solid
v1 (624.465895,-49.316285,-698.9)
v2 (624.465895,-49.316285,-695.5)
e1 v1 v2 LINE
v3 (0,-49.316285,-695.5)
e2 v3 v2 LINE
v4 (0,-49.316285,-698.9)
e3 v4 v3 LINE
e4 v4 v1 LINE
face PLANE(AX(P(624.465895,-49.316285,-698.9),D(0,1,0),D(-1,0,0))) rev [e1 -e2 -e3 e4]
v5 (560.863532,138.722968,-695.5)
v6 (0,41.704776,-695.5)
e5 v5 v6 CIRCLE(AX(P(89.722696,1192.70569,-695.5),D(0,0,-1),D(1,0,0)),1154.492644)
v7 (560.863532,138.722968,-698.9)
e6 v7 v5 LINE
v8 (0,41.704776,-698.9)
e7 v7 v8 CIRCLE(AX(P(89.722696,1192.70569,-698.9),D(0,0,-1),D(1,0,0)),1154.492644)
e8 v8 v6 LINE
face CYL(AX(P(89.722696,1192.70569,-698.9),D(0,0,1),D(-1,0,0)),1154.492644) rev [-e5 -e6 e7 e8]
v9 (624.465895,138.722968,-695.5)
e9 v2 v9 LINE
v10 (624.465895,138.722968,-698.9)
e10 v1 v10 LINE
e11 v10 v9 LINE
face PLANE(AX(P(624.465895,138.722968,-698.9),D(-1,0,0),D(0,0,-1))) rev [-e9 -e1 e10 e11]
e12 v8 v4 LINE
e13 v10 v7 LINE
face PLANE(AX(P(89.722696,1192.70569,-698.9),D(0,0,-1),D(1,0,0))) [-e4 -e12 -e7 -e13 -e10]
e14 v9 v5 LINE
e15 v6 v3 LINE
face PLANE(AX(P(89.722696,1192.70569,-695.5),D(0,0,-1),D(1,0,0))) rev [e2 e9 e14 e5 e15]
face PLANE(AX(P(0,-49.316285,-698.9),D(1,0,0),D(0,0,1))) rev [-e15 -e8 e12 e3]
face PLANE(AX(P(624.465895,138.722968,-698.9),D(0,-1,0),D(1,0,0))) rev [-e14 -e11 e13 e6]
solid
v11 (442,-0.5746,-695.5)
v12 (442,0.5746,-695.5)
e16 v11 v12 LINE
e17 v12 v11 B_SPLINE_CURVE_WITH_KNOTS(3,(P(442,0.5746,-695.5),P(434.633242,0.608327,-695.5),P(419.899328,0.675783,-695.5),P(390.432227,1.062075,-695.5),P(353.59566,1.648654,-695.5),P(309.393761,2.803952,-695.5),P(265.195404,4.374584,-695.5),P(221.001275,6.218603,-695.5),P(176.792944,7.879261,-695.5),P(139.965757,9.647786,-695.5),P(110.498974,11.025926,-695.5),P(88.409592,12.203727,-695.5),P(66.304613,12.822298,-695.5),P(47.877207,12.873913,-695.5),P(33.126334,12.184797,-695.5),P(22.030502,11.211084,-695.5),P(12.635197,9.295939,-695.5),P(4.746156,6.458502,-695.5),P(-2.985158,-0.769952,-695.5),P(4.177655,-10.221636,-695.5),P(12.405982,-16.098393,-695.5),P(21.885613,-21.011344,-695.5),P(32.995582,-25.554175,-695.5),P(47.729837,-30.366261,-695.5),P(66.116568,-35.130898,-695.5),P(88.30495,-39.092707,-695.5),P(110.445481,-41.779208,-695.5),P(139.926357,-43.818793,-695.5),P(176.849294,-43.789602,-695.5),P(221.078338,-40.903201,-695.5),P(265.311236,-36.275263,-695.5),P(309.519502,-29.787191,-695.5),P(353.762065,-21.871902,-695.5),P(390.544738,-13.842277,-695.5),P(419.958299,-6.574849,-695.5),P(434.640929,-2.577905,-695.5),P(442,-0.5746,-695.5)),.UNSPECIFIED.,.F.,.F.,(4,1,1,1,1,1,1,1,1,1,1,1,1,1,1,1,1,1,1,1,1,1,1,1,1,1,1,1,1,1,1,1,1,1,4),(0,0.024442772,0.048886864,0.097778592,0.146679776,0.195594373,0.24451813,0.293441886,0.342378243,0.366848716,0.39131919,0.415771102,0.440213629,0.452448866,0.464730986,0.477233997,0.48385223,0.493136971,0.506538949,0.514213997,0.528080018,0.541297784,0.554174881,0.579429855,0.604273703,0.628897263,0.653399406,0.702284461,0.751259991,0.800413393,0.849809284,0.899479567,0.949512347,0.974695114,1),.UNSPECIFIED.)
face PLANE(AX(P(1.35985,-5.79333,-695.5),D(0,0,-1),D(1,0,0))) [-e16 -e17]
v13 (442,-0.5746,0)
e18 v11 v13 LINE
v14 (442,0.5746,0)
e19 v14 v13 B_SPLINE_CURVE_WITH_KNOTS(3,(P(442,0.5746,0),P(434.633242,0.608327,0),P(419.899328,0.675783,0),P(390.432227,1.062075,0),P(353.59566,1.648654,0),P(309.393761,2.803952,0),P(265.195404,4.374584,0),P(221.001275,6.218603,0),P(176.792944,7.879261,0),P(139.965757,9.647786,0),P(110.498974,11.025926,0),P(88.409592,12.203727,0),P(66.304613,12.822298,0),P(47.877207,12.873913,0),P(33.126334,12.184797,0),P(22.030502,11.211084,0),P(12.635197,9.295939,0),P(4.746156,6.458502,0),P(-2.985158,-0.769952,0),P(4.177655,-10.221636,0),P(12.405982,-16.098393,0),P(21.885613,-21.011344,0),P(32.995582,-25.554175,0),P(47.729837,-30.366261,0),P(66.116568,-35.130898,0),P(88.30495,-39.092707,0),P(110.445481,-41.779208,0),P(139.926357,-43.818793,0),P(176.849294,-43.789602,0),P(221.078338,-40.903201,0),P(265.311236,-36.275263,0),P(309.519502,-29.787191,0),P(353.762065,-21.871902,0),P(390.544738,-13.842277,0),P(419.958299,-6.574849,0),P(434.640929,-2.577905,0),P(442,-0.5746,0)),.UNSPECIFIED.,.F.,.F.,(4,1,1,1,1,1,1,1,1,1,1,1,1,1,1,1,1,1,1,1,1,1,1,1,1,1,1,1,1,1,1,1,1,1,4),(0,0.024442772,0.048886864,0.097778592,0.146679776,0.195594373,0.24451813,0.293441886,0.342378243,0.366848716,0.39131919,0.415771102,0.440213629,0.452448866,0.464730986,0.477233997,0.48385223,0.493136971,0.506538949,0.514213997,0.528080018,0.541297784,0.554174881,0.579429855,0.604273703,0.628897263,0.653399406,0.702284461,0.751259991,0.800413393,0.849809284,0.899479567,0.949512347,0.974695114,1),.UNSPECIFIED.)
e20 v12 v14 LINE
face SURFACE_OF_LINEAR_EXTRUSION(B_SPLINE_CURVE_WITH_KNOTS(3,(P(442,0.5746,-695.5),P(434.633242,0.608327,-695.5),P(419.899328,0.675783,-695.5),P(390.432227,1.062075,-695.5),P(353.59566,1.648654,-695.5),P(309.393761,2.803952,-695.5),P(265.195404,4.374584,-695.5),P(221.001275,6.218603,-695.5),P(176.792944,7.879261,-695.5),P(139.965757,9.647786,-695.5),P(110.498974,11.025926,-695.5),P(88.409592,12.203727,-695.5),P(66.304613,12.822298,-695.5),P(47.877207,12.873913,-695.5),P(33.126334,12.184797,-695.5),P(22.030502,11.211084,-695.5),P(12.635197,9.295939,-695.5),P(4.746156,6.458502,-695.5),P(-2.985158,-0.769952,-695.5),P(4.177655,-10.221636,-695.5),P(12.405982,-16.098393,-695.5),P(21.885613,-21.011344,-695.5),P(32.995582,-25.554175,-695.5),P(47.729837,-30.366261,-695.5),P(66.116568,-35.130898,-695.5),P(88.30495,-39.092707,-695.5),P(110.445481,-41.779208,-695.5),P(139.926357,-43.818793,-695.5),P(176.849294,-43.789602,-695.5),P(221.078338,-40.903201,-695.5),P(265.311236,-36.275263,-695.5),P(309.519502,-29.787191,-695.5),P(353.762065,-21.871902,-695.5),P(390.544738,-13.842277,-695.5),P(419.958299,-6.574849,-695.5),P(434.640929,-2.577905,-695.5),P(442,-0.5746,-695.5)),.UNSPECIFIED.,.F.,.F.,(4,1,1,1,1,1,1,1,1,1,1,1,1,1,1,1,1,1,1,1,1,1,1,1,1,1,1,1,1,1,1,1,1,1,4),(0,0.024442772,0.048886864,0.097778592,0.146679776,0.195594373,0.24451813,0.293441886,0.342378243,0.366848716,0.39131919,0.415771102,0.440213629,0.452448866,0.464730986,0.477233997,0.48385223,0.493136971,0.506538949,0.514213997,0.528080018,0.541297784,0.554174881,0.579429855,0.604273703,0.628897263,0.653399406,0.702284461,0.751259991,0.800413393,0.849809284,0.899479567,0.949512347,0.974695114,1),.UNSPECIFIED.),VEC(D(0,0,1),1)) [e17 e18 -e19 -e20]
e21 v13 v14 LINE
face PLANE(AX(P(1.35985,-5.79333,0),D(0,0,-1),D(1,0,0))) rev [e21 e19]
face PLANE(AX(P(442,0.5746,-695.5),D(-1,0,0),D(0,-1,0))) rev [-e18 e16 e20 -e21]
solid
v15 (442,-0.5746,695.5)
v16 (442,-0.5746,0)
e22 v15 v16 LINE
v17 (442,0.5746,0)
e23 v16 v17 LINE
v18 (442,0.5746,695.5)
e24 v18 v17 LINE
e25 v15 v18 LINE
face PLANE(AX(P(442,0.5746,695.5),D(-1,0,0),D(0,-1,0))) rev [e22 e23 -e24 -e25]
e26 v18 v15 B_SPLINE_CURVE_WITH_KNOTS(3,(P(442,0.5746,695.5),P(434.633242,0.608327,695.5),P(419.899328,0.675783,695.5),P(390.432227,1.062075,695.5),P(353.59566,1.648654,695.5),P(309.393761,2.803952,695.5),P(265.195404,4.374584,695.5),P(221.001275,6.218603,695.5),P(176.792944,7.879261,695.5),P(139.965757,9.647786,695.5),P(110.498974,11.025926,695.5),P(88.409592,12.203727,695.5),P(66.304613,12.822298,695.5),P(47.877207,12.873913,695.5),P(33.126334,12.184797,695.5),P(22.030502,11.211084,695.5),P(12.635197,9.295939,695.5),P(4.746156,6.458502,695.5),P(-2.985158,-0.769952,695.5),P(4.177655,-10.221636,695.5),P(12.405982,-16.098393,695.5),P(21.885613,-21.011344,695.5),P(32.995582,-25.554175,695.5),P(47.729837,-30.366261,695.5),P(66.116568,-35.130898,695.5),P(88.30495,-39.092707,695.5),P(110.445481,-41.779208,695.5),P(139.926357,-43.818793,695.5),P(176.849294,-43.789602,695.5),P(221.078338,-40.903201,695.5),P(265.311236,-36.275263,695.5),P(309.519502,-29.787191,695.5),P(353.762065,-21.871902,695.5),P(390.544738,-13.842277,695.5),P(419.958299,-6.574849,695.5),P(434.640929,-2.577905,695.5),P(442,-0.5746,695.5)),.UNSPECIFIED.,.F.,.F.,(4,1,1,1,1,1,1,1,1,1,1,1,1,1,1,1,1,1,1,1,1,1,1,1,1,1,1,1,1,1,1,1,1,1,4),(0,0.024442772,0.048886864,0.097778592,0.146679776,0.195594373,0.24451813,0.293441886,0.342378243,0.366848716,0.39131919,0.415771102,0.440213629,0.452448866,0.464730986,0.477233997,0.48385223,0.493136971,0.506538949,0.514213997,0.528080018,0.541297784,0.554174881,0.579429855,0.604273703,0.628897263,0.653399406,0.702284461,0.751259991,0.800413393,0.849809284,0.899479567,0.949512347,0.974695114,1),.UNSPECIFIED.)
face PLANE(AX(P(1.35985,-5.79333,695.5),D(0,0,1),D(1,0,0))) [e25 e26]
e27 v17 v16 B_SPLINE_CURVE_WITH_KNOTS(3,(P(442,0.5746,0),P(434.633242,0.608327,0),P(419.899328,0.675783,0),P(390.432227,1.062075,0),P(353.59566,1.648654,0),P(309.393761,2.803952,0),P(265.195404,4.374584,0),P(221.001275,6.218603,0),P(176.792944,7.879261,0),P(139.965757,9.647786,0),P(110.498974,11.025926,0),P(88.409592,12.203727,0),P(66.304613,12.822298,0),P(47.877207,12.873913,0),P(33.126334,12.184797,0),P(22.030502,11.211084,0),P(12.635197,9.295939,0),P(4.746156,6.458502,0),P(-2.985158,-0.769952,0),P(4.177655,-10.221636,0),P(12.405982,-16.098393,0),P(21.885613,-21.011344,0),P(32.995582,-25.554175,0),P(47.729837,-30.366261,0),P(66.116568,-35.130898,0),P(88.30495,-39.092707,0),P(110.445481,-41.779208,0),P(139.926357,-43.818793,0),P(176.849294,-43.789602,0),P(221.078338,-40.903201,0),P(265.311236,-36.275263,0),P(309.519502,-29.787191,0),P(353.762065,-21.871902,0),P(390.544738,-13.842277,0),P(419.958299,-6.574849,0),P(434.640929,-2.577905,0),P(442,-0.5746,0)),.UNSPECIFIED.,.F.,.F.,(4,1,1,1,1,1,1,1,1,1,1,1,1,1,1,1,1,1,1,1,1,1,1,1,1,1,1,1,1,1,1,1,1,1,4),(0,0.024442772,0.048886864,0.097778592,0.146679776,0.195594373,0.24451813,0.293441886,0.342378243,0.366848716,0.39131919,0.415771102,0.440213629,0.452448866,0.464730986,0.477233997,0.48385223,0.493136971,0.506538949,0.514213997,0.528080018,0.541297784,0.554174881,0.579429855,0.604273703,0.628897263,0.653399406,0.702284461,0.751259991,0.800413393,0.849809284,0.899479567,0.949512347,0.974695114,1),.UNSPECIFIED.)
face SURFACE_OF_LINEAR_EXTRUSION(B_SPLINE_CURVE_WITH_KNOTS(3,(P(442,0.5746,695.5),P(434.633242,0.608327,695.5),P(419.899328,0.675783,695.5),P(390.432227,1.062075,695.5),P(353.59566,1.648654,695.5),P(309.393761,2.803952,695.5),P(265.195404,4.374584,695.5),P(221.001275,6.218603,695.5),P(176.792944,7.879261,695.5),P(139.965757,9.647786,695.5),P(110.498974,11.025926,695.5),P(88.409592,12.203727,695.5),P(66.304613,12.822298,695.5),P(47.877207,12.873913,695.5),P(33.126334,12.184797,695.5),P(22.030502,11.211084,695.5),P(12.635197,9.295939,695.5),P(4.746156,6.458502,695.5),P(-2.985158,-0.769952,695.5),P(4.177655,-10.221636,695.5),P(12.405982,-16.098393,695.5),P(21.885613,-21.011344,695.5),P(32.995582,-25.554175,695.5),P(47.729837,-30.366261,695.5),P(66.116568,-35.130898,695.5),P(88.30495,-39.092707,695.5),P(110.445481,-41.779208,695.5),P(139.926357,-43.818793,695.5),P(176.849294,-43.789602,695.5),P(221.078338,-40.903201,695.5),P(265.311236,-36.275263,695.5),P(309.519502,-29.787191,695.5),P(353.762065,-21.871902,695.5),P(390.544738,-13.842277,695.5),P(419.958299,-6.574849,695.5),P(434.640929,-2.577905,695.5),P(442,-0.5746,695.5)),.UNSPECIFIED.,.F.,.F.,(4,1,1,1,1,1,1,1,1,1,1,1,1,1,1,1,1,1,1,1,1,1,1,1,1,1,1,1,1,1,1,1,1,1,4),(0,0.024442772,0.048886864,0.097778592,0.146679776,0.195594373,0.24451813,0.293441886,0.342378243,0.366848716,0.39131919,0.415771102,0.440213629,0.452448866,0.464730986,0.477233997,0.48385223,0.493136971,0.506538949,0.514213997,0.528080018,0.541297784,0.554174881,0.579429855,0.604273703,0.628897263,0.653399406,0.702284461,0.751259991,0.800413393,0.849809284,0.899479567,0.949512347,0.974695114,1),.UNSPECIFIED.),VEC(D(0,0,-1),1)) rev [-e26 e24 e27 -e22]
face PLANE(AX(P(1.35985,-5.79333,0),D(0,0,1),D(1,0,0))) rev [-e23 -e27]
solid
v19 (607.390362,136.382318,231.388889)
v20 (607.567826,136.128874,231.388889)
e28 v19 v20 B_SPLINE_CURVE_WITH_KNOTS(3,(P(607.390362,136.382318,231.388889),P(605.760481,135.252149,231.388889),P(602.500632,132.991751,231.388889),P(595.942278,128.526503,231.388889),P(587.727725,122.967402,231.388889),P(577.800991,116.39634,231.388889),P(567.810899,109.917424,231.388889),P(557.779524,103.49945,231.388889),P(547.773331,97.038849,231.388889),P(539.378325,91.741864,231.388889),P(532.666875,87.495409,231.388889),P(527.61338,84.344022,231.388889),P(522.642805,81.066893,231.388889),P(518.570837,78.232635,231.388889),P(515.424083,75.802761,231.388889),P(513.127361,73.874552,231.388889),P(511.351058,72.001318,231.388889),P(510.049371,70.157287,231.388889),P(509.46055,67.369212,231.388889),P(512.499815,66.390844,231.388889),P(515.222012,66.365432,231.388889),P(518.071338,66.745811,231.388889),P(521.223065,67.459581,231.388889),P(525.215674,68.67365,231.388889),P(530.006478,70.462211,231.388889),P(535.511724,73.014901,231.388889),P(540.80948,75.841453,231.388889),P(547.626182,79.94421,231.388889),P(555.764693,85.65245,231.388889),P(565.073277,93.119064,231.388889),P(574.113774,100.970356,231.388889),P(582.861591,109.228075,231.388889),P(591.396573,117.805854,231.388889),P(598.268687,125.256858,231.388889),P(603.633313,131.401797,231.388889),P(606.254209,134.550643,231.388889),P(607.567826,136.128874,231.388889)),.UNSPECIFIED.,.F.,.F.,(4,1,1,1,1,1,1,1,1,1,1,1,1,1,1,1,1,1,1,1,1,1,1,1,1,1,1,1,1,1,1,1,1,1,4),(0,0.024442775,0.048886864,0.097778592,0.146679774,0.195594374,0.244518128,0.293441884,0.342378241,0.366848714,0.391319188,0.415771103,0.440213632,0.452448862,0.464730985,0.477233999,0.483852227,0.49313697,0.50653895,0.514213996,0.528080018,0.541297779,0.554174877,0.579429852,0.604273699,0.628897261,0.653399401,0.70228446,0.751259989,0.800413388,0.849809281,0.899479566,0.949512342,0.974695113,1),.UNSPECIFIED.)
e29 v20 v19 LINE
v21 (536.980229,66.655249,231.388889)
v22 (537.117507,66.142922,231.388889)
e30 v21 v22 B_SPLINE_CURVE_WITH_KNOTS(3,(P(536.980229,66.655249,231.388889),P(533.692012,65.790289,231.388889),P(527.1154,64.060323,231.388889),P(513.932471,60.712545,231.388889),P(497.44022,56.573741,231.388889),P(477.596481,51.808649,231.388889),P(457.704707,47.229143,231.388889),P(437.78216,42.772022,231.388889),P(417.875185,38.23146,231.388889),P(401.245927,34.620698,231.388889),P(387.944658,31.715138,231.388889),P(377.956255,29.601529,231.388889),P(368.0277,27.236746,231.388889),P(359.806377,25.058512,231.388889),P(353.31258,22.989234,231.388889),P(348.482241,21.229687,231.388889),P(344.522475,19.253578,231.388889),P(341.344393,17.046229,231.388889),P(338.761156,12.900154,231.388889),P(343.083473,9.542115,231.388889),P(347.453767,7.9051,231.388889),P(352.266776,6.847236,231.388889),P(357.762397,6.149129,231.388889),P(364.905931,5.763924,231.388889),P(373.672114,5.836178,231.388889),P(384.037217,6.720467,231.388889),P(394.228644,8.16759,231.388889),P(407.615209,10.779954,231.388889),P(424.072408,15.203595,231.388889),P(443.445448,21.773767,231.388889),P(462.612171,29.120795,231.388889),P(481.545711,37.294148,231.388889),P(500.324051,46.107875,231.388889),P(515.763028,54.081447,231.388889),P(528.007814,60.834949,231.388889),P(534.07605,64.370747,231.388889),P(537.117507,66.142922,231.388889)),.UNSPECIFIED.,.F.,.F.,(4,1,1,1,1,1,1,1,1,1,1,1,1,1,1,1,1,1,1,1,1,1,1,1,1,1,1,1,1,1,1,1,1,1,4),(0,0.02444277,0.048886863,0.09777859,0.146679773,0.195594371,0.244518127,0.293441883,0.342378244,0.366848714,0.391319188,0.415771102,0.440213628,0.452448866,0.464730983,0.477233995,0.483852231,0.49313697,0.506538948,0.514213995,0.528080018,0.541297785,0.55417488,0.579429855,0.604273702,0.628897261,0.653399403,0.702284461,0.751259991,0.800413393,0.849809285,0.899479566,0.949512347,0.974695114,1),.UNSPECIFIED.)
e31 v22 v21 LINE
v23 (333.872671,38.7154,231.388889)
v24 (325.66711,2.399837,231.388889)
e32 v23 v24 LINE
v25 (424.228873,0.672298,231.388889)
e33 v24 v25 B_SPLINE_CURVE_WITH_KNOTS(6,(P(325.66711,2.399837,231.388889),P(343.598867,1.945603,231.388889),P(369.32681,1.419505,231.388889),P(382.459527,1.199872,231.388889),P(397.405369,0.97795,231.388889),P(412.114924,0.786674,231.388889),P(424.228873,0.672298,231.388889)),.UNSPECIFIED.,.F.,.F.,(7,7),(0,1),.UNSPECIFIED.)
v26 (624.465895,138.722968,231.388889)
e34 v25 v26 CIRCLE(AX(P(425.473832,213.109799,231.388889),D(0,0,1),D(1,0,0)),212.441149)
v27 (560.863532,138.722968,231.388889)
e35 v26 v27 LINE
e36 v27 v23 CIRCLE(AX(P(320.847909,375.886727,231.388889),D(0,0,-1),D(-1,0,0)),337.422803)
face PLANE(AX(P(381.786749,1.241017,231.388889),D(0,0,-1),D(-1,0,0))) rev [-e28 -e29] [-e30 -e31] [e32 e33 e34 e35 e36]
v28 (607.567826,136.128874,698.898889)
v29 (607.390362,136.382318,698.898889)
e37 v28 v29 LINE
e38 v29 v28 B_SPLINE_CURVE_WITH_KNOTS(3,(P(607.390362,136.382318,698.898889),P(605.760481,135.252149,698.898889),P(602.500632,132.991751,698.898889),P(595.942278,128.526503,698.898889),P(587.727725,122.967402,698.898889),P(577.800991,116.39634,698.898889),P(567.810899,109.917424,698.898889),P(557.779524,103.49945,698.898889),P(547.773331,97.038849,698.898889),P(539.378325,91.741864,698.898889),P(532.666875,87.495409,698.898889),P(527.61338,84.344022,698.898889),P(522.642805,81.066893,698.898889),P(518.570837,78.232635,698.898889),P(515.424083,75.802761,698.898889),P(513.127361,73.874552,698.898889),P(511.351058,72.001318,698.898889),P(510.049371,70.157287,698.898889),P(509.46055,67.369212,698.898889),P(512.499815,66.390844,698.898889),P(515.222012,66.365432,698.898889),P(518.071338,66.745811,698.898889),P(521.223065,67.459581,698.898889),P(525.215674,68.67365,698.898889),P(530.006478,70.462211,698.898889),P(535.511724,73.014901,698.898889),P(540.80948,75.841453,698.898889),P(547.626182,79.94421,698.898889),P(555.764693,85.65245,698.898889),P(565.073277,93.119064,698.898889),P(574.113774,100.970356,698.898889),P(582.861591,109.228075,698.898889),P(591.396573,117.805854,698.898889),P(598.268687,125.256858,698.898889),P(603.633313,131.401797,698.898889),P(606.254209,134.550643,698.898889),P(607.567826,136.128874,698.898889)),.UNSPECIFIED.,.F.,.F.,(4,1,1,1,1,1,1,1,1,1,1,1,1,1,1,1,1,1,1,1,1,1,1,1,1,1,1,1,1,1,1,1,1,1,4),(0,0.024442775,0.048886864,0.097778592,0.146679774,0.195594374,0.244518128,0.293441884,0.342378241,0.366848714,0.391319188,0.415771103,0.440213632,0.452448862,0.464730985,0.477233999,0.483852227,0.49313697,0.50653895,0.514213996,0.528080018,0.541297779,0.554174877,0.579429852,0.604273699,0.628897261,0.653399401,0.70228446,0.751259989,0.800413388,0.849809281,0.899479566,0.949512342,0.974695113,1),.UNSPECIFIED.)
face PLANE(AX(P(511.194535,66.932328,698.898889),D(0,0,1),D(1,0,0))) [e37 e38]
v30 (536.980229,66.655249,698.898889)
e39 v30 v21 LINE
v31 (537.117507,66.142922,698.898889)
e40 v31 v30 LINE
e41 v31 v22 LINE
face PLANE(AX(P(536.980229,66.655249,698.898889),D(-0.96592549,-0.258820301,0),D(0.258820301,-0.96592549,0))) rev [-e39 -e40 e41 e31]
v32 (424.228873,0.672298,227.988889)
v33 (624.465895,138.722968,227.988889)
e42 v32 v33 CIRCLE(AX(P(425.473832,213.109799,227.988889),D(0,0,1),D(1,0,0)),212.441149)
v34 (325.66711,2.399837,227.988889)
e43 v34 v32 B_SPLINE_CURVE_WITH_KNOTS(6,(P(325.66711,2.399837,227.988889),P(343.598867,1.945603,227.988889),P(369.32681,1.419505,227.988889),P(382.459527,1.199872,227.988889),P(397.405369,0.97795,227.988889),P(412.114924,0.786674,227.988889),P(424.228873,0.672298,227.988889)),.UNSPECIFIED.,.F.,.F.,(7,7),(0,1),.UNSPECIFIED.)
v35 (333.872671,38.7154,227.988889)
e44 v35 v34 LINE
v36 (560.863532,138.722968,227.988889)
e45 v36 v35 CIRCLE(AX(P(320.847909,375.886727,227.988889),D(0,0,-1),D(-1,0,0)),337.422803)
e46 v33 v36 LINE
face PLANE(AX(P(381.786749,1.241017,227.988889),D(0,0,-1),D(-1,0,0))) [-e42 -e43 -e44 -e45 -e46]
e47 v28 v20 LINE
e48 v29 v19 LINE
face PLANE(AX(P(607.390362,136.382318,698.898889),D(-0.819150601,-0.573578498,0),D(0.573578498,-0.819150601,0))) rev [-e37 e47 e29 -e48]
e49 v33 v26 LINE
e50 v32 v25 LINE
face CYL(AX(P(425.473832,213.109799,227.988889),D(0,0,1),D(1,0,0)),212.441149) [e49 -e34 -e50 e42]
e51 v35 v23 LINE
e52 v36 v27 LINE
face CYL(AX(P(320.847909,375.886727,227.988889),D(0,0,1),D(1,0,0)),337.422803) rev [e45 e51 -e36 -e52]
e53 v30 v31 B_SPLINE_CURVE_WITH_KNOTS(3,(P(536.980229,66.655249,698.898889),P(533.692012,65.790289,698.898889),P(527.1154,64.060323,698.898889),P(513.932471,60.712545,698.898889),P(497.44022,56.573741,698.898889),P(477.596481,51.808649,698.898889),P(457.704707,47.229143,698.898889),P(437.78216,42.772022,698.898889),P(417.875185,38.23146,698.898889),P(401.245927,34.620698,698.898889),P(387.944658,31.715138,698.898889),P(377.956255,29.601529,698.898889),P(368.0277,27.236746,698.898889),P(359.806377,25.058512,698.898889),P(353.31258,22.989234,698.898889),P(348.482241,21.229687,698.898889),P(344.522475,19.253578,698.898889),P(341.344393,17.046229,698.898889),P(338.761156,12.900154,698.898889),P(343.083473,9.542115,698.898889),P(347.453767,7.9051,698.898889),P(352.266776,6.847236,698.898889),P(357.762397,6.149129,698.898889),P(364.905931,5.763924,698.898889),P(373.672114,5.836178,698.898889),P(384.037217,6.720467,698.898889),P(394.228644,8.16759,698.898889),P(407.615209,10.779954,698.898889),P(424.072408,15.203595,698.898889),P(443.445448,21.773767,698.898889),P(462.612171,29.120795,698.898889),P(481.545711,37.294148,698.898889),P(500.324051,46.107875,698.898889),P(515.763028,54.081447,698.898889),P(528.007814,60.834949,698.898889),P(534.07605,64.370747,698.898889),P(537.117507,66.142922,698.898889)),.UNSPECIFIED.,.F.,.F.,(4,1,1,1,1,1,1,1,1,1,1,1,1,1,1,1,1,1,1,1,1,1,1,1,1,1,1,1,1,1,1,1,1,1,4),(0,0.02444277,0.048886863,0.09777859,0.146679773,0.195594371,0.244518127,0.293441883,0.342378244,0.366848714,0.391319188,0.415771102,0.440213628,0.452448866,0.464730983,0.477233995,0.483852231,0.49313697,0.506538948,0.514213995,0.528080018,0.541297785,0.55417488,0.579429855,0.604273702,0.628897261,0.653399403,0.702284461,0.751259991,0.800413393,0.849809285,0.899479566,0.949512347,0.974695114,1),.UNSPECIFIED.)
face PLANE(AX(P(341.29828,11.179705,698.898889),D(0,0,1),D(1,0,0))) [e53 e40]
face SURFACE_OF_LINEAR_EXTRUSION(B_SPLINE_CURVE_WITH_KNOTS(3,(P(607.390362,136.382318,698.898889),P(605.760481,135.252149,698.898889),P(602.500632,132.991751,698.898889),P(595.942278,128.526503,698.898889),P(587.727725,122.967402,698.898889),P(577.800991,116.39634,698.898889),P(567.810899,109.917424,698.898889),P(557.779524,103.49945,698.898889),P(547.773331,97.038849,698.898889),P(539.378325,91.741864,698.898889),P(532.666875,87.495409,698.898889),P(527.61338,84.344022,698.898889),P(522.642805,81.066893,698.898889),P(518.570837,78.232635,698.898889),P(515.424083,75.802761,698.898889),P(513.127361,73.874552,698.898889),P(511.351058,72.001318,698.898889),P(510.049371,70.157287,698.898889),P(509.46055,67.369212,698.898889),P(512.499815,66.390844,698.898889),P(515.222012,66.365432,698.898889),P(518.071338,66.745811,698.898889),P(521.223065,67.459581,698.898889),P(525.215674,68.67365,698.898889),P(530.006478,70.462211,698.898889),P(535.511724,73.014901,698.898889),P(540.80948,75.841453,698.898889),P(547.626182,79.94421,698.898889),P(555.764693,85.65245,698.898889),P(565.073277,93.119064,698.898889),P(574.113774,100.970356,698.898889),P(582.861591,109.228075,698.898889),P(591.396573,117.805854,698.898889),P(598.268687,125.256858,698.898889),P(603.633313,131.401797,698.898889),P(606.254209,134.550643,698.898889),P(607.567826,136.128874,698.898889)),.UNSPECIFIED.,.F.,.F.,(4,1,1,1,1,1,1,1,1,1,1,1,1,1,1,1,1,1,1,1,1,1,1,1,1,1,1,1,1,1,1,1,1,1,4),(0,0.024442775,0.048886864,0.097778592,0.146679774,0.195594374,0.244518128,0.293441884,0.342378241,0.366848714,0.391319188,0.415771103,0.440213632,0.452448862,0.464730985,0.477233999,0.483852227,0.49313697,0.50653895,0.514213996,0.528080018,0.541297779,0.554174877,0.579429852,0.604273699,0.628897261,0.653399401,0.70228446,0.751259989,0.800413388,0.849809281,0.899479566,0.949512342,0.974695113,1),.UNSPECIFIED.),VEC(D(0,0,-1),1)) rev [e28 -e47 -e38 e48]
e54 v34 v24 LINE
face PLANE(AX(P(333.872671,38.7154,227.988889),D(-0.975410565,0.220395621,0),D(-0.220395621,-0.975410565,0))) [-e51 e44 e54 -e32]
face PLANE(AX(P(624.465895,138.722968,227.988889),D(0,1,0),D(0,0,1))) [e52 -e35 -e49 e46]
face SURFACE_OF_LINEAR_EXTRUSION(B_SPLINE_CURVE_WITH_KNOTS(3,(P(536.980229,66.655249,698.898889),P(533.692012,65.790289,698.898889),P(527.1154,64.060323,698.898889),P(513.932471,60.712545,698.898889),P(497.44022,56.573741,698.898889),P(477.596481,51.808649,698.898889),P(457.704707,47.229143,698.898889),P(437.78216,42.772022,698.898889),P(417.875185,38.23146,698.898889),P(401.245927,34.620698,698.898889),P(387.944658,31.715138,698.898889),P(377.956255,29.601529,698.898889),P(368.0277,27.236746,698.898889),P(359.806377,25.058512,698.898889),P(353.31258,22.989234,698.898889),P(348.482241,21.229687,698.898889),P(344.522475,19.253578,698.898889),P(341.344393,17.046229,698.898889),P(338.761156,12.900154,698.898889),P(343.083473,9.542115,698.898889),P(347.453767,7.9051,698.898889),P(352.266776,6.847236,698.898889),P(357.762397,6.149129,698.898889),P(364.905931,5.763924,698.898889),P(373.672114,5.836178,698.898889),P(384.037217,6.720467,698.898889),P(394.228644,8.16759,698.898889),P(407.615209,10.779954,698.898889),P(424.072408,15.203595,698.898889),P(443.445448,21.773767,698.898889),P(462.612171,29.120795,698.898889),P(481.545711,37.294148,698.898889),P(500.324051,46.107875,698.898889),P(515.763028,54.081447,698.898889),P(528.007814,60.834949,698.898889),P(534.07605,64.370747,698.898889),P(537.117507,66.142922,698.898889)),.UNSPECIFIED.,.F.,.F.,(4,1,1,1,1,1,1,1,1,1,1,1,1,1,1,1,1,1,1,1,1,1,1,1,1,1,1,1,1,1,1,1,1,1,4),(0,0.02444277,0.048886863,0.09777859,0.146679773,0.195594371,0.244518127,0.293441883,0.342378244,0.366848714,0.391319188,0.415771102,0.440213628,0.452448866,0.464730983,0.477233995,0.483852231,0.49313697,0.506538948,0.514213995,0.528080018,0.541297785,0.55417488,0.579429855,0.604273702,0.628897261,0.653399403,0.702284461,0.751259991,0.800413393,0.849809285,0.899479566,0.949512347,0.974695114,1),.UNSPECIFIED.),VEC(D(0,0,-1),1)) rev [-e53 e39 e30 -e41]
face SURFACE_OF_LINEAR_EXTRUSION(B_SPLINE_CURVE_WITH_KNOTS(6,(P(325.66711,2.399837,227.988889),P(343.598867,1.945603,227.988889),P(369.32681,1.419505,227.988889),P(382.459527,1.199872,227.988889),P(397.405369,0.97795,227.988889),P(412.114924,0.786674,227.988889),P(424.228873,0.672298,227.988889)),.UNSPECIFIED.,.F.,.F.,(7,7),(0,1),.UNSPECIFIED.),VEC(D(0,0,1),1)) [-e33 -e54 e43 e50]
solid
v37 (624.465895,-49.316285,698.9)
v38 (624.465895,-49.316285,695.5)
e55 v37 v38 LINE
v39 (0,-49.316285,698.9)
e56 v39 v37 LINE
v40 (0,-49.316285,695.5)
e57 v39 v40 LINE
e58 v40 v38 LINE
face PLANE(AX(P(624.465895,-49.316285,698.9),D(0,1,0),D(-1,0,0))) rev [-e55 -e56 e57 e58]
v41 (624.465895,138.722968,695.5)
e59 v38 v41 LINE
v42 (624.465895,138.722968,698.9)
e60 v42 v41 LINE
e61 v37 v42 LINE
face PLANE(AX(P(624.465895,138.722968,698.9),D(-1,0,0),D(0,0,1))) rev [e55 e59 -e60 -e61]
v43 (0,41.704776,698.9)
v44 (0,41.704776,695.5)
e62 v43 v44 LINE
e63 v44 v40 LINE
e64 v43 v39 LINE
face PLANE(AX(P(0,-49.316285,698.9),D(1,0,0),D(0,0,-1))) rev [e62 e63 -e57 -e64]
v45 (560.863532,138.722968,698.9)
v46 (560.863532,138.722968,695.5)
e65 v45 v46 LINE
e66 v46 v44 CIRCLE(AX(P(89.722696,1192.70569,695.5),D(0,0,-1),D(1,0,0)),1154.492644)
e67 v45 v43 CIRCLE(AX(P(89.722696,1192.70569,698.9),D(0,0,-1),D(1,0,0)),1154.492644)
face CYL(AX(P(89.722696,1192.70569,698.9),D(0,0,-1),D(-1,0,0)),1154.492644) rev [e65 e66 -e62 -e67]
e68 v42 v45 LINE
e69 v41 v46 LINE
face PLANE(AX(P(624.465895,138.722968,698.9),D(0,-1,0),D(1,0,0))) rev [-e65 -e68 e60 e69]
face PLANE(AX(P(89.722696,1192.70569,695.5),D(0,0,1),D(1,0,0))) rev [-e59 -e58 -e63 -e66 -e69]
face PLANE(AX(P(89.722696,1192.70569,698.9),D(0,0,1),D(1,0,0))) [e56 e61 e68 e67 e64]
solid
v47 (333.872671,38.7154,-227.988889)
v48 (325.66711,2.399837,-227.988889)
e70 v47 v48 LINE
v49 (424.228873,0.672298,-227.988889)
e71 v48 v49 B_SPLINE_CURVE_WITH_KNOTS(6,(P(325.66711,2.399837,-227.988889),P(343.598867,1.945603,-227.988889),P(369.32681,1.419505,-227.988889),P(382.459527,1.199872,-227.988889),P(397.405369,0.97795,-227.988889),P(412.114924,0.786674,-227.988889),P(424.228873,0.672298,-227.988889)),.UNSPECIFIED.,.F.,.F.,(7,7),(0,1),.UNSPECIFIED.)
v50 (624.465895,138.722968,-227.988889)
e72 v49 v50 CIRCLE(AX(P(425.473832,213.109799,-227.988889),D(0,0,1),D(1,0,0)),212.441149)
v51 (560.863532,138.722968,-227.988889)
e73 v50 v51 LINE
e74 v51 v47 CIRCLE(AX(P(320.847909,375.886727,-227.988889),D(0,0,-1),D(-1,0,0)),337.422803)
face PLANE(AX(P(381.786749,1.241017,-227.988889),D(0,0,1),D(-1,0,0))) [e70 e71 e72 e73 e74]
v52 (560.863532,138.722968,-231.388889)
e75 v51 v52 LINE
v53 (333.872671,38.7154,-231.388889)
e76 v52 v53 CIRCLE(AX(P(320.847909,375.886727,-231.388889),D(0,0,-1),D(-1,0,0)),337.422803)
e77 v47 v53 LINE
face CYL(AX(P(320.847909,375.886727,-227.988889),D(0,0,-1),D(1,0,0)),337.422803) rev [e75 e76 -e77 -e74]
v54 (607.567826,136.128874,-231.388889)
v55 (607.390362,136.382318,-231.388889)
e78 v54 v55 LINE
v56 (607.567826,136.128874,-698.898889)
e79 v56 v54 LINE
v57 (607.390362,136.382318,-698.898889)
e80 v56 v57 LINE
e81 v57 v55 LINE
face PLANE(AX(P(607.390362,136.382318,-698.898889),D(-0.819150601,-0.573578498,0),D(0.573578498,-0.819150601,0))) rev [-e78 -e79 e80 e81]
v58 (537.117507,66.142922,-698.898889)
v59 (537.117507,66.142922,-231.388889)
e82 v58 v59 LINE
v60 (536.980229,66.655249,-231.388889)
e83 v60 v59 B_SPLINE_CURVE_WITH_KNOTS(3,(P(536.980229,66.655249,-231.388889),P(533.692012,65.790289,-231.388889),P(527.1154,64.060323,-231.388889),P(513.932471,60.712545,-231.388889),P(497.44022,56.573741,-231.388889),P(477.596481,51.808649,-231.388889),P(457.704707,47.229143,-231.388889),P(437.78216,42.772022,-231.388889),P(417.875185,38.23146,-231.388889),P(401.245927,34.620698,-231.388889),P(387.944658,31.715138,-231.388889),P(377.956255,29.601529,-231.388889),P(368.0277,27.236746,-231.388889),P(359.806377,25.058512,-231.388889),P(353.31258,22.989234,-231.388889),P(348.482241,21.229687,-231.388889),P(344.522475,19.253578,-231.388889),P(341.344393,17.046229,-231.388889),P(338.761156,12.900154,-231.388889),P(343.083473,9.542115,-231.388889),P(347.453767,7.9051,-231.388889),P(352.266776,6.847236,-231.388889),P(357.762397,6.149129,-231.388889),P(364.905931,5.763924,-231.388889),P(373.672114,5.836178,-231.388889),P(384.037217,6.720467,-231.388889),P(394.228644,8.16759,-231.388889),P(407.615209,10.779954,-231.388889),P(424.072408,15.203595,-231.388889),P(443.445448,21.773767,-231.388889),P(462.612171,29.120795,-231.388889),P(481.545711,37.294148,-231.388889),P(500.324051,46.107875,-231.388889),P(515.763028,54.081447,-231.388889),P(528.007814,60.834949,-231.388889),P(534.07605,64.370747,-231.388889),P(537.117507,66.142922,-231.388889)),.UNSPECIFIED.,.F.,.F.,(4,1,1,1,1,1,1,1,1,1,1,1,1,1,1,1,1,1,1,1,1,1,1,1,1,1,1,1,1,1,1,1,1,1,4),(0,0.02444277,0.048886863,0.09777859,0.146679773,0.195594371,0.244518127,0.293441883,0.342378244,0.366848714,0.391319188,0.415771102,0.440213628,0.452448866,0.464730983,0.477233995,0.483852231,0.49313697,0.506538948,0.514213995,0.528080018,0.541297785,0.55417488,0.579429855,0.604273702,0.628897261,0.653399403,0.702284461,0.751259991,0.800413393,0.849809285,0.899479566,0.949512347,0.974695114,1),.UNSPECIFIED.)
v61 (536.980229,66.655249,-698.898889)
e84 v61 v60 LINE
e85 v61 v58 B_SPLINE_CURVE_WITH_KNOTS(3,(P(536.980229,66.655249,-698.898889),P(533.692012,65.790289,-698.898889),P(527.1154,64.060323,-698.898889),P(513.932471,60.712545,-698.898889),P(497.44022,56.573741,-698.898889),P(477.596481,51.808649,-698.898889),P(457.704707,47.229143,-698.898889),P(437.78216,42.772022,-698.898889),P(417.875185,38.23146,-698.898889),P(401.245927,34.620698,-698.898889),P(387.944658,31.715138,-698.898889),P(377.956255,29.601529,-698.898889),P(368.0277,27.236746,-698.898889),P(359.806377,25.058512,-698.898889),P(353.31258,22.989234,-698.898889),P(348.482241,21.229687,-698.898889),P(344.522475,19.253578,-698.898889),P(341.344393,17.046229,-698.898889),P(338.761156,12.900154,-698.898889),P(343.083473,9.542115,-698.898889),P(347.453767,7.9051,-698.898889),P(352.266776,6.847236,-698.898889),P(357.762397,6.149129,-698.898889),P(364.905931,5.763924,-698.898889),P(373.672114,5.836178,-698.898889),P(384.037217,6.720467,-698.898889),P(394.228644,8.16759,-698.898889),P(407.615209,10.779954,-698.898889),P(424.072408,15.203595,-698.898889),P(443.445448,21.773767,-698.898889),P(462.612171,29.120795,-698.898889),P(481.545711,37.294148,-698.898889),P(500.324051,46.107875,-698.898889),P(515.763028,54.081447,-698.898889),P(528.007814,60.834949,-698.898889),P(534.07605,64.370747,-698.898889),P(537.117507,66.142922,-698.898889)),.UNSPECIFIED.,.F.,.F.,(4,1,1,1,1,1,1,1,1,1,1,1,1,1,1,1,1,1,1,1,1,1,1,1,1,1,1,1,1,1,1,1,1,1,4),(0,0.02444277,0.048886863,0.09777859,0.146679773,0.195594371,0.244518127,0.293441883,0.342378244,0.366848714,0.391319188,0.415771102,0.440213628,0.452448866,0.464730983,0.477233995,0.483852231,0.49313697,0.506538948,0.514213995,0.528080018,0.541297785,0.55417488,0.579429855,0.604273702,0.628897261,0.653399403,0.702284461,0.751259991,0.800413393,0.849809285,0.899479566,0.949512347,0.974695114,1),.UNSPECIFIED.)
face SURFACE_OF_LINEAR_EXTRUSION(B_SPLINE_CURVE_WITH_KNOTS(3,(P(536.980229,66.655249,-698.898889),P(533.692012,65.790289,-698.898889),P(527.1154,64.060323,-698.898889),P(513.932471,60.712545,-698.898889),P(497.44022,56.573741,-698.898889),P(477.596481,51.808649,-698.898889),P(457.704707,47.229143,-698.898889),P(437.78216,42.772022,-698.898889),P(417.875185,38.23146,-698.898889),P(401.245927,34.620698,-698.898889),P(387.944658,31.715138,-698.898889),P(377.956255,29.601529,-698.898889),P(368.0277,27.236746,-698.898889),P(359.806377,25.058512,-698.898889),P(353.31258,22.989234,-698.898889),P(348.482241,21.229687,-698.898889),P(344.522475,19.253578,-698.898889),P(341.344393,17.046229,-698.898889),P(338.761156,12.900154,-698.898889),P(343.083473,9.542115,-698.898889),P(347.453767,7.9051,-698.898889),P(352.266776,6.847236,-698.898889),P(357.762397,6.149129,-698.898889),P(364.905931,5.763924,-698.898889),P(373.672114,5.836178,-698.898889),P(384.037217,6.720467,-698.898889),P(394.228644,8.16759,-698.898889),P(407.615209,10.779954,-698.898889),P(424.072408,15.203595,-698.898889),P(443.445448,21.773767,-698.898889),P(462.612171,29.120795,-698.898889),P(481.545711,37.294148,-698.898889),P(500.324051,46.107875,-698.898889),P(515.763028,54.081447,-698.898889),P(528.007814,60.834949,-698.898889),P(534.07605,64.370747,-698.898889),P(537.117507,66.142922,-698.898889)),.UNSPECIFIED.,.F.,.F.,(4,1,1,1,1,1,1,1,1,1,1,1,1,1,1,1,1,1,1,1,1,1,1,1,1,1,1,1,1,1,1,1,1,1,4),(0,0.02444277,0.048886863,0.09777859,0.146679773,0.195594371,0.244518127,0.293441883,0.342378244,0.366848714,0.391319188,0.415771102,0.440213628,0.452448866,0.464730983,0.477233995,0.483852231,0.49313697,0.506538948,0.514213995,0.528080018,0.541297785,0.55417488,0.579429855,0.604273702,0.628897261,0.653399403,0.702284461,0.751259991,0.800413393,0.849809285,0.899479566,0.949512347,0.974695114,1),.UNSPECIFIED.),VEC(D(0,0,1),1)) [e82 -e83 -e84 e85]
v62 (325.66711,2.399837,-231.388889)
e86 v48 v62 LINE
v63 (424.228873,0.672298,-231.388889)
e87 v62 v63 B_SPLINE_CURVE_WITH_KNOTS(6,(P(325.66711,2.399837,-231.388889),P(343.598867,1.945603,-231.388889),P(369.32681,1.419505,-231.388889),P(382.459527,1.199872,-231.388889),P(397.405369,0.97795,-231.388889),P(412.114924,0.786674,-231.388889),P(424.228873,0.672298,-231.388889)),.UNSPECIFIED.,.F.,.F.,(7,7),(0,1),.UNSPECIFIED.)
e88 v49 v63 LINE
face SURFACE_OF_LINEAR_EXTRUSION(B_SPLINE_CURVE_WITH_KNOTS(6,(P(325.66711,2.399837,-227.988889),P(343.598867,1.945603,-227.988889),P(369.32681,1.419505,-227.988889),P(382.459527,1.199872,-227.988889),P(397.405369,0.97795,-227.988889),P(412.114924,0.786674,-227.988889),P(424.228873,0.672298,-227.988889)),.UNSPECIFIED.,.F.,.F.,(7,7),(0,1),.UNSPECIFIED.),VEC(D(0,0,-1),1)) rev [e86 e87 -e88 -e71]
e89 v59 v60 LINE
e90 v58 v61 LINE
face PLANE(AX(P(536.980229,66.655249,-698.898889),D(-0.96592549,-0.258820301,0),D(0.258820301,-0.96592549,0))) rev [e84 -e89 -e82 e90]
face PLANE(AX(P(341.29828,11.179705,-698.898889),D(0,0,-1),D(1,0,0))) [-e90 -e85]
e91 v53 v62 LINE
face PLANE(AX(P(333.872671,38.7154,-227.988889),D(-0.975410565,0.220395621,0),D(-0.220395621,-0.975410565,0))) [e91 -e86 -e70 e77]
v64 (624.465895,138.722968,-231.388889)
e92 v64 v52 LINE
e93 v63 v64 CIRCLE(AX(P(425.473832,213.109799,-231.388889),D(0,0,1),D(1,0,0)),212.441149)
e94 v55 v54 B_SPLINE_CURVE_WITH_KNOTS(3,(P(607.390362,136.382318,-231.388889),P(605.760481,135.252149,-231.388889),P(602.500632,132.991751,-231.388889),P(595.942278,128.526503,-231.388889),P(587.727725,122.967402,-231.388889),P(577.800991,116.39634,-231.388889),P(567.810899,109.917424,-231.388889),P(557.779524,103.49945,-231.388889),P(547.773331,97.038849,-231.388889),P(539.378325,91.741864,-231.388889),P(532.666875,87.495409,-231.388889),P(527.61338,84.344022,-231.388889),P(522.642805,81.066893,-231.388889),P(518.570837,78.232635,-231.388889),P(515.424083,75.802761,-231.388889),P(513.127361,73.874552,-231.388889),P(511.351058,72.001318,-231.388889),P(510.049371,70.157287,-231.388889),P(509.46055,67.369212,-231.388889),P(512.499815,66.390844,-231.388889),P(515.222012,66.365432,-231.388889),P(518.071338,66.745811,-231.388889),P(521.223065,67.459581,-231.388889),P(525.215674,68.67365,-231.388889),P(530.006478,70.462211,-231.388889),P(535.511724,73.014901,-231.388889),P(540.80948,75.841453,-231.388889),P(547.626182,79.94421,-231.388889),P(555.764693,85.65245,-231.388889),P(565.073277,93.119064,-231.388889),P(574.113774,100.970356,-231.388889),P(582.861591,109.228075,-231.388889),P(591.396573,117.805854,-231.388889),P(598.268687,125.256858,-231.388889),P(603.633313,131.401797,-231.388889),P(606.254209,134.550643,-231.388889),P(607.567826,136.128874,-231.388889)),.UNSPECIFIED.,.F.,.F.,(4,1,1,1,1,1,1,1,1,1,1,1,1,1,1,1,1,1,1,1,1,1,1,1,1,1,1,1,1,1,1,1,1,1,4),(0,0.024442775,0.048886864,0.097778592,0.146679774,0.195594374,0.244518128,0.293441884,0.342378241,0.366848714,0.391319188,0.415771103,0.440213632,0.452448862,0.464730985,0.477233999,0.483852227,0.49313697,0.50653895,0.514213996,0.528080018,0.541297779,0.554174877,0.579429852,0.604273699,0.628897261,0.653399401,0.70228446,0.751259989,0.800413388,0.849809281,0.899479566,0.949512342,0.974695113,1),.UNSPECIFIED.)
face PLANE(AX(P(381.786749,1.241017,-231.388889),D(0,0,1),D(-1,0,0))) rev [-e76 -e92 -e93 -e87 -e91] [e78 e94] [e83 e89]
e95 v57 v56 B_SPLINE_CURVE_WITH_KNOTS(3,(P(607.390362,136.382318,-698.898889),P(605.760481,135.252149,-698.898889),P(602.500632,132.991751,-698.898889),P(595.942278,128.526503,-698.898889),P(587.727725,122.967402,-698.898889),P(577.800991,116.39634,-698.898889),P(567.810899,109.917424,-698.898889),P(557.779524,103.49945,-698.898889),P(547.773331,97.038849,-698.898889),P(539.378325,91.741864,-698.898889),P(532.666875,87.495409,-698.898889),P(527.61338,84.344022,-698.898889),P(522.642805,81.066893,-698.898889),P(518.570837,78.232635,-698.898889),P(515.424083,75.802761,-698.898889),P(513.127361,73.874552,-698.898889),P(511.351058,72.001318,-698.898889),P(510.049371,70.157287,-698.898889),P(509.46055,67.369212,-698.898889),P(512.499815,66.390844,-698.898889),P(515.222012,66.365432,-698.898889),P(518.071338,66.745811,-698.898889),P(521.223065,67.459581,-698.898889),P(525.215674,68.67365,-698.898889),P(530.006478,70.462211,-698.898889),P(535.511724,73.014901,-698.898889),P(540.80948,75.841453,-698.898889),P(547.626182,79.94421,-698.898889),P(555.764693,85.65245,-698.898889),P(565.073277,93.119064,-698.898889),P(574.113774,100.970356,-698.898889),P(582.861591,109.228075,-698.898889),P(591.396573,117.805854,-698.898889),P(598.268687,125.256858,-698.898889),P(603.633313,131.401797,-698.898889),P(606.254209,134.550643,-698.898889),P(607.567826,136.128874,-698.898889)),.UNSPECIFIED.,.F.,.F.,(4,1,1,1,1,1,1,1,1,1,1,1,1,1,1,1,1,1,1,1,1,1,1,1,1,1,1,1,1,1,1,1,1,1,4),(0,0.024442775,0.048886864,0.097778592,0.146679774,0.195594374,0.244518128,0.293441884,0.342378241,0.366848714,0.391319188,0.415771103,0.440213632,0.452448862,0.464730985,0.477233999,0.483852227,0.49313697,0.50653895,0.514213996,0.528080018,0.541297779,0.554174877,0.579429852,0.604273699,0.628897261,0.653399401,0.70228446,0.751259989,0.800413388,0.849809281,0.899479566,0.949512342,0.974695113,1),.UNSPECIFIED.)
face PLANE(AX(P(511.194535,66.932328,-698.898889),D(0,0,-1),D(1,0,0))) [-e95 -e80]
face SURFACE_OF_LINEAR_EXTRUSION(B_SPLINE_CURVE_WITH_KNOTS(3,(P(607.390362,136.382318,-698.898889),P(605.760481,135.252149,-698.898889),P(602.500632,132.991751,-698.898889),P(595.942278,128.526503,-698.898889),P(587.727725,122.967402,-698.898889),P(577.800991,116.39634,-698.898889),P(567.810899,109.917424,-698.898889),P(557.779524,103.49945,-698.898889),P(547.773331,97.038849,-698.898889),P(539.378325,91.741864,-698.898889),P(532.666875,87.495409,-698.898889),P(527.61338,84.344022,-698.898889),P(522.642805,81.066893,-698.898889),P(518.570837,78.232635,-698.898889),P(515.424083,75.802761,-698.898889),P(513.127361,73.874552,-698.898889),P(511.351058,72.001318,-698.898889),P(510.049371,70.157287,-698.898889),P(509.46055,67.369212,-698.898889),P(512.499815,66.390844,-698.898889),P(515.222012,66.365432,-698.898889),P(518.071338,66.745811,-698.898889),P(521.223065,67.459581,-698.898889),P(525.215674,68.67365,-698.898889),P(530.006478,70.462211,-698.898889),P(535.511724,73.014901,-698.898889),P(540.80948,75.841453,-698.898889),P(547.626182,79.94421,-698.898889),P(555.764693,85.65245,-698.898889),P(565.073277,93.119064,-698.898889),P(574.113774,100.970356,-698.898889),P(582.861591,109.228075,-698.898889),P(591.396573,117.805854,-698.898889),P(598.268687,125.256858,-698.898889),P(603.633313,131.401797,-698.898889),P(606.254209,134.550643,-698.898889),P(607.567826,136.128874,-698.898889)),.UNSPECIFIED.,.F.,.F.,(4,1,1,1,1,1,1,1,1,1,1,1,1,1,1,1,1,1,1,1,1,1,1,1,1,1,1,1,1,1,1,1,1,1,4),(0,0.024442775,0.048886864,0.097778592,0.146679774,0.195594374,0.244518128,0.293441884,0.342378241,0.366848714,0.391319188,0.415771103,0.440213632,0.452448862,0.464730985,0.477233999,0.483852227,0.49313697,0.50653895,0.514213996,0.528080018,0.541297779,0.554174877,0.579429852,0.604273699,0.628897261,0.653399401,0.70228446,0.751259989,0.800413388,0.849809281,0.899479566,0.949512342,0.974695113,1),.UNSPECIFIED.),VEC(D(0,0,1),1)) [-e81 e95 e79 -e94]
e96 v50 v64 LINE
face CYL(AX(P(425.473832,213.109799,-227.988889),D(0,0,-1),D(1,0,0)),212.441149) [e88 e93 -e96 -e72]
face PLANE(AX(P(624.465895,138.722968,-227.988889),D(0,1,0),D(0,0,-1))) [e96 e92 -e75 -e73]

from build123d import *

# Parameters (mm, degrees)
BOSS_EXTRUDE1_DEPTH = 409.117647
BOSS_EXTRUDE3_DEPTH = 275.00588235
BOSS_EXTRUDE4_DEPTH = 275.00588235
BOSS_EXTRUDE5_START = -2
BOSS_EXTRUDE5_DEPTH = 2
BOSS_EXTRUDE9_DEPTH = 2
SCALE1_SCALE        = 1.7


# Read off the part's stored shape, not the designer's step: Boss-Extrude5
with BuildPart() as part:
    # Sketch4 → Boss-Extrude1 (new body)
    with BuildSketch(Plane.XY):
        with BuildLine():
            Line((260, 0.338), (260, -0.338))
            add(Edge.make_bspline(
                [(260, -0.338), (255.671134416, -1.516414962), (247.034293782, -3.867558011), (229.732198635, -8.142516043), (208.095332328, -12.865824713), (182.070295086, -17.52187714), (156.065433036, -21.33839003), (130.04608131, -24.060706609), (104.028996678, -25.758589144), (82.309621921, -25.775760663), (64.967929801, -24.576004726), (51.944088226, -22.995710172), (38.892098593, -20.665234217), (28.076374793, -17.862506322), (19.409165866, -15.031867898), (12.873889977, -12.359614398), (7.297636497, -9.469642807), (2.457443903, -6.012727152), (-1.755975169, -0.452912883), (2.791856276, 3.799118742), (7.432468627, 5.468199276), (12.959118785, 6.594755148), (19.486078925, 7.167527694), (28.163063188, 7.572890101), (39.002713335, 7.542528182), (52.005642383, 7.178662792), (64.99939665, 6.485838665), (82.332797947, 5.675168232), (103.995849486, 4.634859687), (130.000749859, 3.658001845), (155.997296268, 2.573284486), (181.996330165, 1.649383439), (207.997446916, 0.969796253), (229.66601603, 0.624750289), (246.999604816, 0.397519697), (255.666612935, 0.357839542), (260, 0.338)],
                knots=[0, 0, 0, 0, 0.025304886, 0.050487653, 0.100520433, 0.150190716, 0.199586607, 0.248740009, 0.297715539, 0.346600594, 0.371102737, 0.395726297, 0.420570145, 0.445825119, 0.458702216, 0.471919982, 0.485786003, 0.493461051, 0.506863029, 0.51614777, 0.522766003, 0.535269014, 0.547551134, 0.559786371, 0.584228898, 0.60868081, 0.633151284, 0.657621757, 0.706558114, 0.75548187, 0.804405627, 0.853320224, 0.902221408, 0.951113136, 0.975557228, 1, 1, 1, 1], degree=3))
        make_face()
    extrude(amount=BOSS_EXTRUDE1_DEPTH)


with BuildPart() as body_2:
    # Sketch7 → Boss-Extrude3 (new body)
    with BuildSketch(Plane.XY.offset(136.11111111)):
        with BuildLine():
            Line((315.870723, 39.20897), (315.951475, 38.907601))
            add(Edge.make_bspline(
                [(315.951475, 38.907601), (314.162382578, 37.865145197), (310.592831717, 35.78526438), (303.390016539, 31.812615724), (294.308265411, 27.122279449), (283.262183068, 21.937734339), (272.124806483, 17.129879311), (260.850263498, 12.808098108), (249.454357747, 8.943291101), (239.773652509, 6.34114928), (231.899202412, 4.804464985), (225.904245036, 3.953215779), (219.807125691, 3.433045796), (214.650547504, 3.390543338), (210.448468632, 3.617134945), (207.21575065, 4.027785995), (204.384568854, 4.650059029), (201.813807887, 5.613008864), (199.27126803, 7.588326051), (200.790819383, 10.027193325), (202.660279447, 11.325634111), (204.989553739, 12.488051205), (207.830929407, 13.523078656), (211.650810078, 14.740301317), (216.486882257, 16.021615518), (222.327208641, 17.41266421), (228.202740217, 18.655963806), (236.027016072, 20.36511664), (245.808932451, 22.489094306), (257.518917899, 25.160012954), (269.238063033, 27.781848898), (280.939106657, 30.475676099), (292.611894114, 33.278670937), (302.313218201, 35.71326156), (310.067882177, 37.682543093), (313.936477602, 38.700170205), (315.870723, 39.20897)],
                knots=[0, 0, 0, 0, 0.025304886, 0.050487653, 0.100520434, 0.150190715, 0.199586607, 0.248740009, 0.297715539, 0.346600597, 0.371102739, 0.395726298, 0.420570145, 0.44582512, 0.458702215, 0.471919982, 0.485786005, 0.493461052, 0.50686303, 0.516147769, 0.522766005, 0.535269017, 0.547551134, 0.559786372, 0.584228898, 0.608680812, 0.633151286, 0.657621756, 0.706558117, 0.755481873, 0.804405629, 0.853320227, 0.90222141, 0.951113137, 0.97555723, 1, 1, 1, 1], degree=3))
        make_face()
    extrude(amount=BOSS_EXTRUDE3_DEPTH)



with BuildPart() as body_3:
    # Sketch8 → Boss-Extrude4 (new body)
    with BuildSketch(Plane.XY.offset(136.11111111)):
        with BuildLine():
            Line((357.288448, 80.224893), (357.392839, 80.075808))
            add(Edge.make_bspline(
                [(357.392839, 80.075808), (356.620122763, 79.14743677), (355.078419259, 77.29517444), (351.922757302, 73.680504701), (347.880336886, 69.297560959), (342.859759573, 64.251808822), (337.713984567, 59.394326829), (332.396045475, 54.775920248), (326.920407777, 50.383794268), (322.133048059, 47.02600566), (318.123223552, 44.612619584), (315.006896562, 42.949941587), (311.768516646, 41.448359544), (308.950396673, 40.396264989), (306.601803062, 39.682106717), (304.74784604, 39.262242045), (303.071771935, 39.038489289), (301.470479137, 39.053437498), (299.682676349, 39.628948524), (300.029041565, 41.268992156), (300.794740272, 42.353716288), (301.839624042, 43.455618804), (303.190637013, 44.589859378), (305.041668965, 46.019196952), (307.436944014, 47.686407794), (310.360811955, 49.614130635), (313.333455795, 51.467887671), (317.281367644, 53.965802203), (322.219606269, 57.08167597), (328.105602635, 60.882029467), (334.006411273, 64.657308071), (339.882935631, 68.46843545), (345.7221912, 72.333766121), (350.554281154, 75.603825383), (354.412136757, 78.230441634), (356.329694769, 79.560087793), (357.288448, 80.224893)],
                knots=[0, 0, 0, 0, 0.025304887, 0.050487658, 0.100520434, 0.150190719, 0.199586612, 0.248740011, 0.29771554, 0.346600599, 0.371102739, 0.395726301, 0.420570148, 0.445825123, 0.458702221, 0.471919982, 0.485786004, 0.49346105, 0.50686303, 0.516147773, 0.522766001, 0.535269015, 0.547551138, 0.559786368, 0.584228897, 0.608680812, 0.633151286, 0.657621759, 0.706558116, 0.755481872, 0.804405626, 0.853320226, 0.902221408, 0.951113136, 0.975557225, 1, 1, 1, 1], degree=3))
        make_face()
    extrude(amount=BOSS_EXTRUDE4_DEPTH)


with BuildPart() as body_2_1:
    add(body_2.part)

    add(body_3.part)  # Boss-Extrude5 merges body 3
    # Boss-Extrude5 outline → Boss-Extrude5 (add)
    with BuildSketch(Plane.XY.offset(136.11111111).offset(BOSS_EXTRUDE5_START)):
        with BuildLine():
            Line((196.395689019, 22.773764987), (191.568888201, 1.411668558))
            add(Edge.make_bspline(
                [(191.568888201, 1.411668558), (202.116980655, 1.144472356), (217.251064759, 0.835003016), (224.976192116, 0.705806864), (233.767864274, 0.575264806), (242.420543536, 0.462749318), (249.546395985, 0.395469517)],
                knots=[0, 0, 0, 0, 0, 0, 0, 1, 1, 1, 1, 1, 1, 1], degree=6))
            ThreePointArc((249.546395985, 0.395469517), (321.210428694, 22.475081792), (367.332879449, 81.601745816))
            Line((367.332879449, 81.601745816), (329.919724454, 81.601745816))
            ThreePointArc((329.919724454, 81.601745816), (268.759443908, 39.473286164), (196.395689019, 22.773764987))
        make_face()
    extrude(amount=BOSS_EXTRUDE5_DEPTH)


with BuildPart() as body_3_2:
    # Sketch11 → Boss-Extrude9 (new body)
    with BuildSketch(Plane.XY.offset(409.117647)):
        with BuildLine():
            Line((0, -29.009579655), (0, 24.532221423))
            ThreePointArc((0, 24.532221423), (168.532063733, 32.416036391), (329.919724454, 81.601745816))
            Line((329.919724454, 81.601745816), (367.332879449, 81.601745816))
            Line((367.332879449, 81.601745816), (367.332879449, -29.009579655))
            Line((367.332879449, -29.009579655), (0, -29.009579655))
        make_face()
    extrude(amount=BOSS_EXTRUDE9_DEPTH)


with BuildPart() as body_2_2:
    # Scale1: scaled about (0, 0, 0)
    add(body_2_1.part.scale(SCALE1_SCALE))


with BuildPart() as body_3_2_1:
    # Scale1: scaled about (0, 0, 0)
    add(body_3_2.part.scale(SCALE1_SCALE))


with BuildPart() as part_1:
    # Scale1: scaled about (0, 0, 0)
    add(part.part.scale(SCALE1_SCALE))


with BuildPart() as body_4:
    # Mirror4: mirrored copy
    add(part_1.part.mirror(Plane.XY))


with BuildPart() as body_5:
    # Mirror4 2: mirrored copy
    add(body_2_2.part.mirror(Plane.XY))


with BuildPart() as body_6:
    # Mirror4 3: mirrored copy
    add(body_3_2_1.part.mirror(Plane.XY))


solid = Compound([body_2_2.part, body_3_2_1.part, part_1.part, body_4.part, body_5.part, body_6.part])
